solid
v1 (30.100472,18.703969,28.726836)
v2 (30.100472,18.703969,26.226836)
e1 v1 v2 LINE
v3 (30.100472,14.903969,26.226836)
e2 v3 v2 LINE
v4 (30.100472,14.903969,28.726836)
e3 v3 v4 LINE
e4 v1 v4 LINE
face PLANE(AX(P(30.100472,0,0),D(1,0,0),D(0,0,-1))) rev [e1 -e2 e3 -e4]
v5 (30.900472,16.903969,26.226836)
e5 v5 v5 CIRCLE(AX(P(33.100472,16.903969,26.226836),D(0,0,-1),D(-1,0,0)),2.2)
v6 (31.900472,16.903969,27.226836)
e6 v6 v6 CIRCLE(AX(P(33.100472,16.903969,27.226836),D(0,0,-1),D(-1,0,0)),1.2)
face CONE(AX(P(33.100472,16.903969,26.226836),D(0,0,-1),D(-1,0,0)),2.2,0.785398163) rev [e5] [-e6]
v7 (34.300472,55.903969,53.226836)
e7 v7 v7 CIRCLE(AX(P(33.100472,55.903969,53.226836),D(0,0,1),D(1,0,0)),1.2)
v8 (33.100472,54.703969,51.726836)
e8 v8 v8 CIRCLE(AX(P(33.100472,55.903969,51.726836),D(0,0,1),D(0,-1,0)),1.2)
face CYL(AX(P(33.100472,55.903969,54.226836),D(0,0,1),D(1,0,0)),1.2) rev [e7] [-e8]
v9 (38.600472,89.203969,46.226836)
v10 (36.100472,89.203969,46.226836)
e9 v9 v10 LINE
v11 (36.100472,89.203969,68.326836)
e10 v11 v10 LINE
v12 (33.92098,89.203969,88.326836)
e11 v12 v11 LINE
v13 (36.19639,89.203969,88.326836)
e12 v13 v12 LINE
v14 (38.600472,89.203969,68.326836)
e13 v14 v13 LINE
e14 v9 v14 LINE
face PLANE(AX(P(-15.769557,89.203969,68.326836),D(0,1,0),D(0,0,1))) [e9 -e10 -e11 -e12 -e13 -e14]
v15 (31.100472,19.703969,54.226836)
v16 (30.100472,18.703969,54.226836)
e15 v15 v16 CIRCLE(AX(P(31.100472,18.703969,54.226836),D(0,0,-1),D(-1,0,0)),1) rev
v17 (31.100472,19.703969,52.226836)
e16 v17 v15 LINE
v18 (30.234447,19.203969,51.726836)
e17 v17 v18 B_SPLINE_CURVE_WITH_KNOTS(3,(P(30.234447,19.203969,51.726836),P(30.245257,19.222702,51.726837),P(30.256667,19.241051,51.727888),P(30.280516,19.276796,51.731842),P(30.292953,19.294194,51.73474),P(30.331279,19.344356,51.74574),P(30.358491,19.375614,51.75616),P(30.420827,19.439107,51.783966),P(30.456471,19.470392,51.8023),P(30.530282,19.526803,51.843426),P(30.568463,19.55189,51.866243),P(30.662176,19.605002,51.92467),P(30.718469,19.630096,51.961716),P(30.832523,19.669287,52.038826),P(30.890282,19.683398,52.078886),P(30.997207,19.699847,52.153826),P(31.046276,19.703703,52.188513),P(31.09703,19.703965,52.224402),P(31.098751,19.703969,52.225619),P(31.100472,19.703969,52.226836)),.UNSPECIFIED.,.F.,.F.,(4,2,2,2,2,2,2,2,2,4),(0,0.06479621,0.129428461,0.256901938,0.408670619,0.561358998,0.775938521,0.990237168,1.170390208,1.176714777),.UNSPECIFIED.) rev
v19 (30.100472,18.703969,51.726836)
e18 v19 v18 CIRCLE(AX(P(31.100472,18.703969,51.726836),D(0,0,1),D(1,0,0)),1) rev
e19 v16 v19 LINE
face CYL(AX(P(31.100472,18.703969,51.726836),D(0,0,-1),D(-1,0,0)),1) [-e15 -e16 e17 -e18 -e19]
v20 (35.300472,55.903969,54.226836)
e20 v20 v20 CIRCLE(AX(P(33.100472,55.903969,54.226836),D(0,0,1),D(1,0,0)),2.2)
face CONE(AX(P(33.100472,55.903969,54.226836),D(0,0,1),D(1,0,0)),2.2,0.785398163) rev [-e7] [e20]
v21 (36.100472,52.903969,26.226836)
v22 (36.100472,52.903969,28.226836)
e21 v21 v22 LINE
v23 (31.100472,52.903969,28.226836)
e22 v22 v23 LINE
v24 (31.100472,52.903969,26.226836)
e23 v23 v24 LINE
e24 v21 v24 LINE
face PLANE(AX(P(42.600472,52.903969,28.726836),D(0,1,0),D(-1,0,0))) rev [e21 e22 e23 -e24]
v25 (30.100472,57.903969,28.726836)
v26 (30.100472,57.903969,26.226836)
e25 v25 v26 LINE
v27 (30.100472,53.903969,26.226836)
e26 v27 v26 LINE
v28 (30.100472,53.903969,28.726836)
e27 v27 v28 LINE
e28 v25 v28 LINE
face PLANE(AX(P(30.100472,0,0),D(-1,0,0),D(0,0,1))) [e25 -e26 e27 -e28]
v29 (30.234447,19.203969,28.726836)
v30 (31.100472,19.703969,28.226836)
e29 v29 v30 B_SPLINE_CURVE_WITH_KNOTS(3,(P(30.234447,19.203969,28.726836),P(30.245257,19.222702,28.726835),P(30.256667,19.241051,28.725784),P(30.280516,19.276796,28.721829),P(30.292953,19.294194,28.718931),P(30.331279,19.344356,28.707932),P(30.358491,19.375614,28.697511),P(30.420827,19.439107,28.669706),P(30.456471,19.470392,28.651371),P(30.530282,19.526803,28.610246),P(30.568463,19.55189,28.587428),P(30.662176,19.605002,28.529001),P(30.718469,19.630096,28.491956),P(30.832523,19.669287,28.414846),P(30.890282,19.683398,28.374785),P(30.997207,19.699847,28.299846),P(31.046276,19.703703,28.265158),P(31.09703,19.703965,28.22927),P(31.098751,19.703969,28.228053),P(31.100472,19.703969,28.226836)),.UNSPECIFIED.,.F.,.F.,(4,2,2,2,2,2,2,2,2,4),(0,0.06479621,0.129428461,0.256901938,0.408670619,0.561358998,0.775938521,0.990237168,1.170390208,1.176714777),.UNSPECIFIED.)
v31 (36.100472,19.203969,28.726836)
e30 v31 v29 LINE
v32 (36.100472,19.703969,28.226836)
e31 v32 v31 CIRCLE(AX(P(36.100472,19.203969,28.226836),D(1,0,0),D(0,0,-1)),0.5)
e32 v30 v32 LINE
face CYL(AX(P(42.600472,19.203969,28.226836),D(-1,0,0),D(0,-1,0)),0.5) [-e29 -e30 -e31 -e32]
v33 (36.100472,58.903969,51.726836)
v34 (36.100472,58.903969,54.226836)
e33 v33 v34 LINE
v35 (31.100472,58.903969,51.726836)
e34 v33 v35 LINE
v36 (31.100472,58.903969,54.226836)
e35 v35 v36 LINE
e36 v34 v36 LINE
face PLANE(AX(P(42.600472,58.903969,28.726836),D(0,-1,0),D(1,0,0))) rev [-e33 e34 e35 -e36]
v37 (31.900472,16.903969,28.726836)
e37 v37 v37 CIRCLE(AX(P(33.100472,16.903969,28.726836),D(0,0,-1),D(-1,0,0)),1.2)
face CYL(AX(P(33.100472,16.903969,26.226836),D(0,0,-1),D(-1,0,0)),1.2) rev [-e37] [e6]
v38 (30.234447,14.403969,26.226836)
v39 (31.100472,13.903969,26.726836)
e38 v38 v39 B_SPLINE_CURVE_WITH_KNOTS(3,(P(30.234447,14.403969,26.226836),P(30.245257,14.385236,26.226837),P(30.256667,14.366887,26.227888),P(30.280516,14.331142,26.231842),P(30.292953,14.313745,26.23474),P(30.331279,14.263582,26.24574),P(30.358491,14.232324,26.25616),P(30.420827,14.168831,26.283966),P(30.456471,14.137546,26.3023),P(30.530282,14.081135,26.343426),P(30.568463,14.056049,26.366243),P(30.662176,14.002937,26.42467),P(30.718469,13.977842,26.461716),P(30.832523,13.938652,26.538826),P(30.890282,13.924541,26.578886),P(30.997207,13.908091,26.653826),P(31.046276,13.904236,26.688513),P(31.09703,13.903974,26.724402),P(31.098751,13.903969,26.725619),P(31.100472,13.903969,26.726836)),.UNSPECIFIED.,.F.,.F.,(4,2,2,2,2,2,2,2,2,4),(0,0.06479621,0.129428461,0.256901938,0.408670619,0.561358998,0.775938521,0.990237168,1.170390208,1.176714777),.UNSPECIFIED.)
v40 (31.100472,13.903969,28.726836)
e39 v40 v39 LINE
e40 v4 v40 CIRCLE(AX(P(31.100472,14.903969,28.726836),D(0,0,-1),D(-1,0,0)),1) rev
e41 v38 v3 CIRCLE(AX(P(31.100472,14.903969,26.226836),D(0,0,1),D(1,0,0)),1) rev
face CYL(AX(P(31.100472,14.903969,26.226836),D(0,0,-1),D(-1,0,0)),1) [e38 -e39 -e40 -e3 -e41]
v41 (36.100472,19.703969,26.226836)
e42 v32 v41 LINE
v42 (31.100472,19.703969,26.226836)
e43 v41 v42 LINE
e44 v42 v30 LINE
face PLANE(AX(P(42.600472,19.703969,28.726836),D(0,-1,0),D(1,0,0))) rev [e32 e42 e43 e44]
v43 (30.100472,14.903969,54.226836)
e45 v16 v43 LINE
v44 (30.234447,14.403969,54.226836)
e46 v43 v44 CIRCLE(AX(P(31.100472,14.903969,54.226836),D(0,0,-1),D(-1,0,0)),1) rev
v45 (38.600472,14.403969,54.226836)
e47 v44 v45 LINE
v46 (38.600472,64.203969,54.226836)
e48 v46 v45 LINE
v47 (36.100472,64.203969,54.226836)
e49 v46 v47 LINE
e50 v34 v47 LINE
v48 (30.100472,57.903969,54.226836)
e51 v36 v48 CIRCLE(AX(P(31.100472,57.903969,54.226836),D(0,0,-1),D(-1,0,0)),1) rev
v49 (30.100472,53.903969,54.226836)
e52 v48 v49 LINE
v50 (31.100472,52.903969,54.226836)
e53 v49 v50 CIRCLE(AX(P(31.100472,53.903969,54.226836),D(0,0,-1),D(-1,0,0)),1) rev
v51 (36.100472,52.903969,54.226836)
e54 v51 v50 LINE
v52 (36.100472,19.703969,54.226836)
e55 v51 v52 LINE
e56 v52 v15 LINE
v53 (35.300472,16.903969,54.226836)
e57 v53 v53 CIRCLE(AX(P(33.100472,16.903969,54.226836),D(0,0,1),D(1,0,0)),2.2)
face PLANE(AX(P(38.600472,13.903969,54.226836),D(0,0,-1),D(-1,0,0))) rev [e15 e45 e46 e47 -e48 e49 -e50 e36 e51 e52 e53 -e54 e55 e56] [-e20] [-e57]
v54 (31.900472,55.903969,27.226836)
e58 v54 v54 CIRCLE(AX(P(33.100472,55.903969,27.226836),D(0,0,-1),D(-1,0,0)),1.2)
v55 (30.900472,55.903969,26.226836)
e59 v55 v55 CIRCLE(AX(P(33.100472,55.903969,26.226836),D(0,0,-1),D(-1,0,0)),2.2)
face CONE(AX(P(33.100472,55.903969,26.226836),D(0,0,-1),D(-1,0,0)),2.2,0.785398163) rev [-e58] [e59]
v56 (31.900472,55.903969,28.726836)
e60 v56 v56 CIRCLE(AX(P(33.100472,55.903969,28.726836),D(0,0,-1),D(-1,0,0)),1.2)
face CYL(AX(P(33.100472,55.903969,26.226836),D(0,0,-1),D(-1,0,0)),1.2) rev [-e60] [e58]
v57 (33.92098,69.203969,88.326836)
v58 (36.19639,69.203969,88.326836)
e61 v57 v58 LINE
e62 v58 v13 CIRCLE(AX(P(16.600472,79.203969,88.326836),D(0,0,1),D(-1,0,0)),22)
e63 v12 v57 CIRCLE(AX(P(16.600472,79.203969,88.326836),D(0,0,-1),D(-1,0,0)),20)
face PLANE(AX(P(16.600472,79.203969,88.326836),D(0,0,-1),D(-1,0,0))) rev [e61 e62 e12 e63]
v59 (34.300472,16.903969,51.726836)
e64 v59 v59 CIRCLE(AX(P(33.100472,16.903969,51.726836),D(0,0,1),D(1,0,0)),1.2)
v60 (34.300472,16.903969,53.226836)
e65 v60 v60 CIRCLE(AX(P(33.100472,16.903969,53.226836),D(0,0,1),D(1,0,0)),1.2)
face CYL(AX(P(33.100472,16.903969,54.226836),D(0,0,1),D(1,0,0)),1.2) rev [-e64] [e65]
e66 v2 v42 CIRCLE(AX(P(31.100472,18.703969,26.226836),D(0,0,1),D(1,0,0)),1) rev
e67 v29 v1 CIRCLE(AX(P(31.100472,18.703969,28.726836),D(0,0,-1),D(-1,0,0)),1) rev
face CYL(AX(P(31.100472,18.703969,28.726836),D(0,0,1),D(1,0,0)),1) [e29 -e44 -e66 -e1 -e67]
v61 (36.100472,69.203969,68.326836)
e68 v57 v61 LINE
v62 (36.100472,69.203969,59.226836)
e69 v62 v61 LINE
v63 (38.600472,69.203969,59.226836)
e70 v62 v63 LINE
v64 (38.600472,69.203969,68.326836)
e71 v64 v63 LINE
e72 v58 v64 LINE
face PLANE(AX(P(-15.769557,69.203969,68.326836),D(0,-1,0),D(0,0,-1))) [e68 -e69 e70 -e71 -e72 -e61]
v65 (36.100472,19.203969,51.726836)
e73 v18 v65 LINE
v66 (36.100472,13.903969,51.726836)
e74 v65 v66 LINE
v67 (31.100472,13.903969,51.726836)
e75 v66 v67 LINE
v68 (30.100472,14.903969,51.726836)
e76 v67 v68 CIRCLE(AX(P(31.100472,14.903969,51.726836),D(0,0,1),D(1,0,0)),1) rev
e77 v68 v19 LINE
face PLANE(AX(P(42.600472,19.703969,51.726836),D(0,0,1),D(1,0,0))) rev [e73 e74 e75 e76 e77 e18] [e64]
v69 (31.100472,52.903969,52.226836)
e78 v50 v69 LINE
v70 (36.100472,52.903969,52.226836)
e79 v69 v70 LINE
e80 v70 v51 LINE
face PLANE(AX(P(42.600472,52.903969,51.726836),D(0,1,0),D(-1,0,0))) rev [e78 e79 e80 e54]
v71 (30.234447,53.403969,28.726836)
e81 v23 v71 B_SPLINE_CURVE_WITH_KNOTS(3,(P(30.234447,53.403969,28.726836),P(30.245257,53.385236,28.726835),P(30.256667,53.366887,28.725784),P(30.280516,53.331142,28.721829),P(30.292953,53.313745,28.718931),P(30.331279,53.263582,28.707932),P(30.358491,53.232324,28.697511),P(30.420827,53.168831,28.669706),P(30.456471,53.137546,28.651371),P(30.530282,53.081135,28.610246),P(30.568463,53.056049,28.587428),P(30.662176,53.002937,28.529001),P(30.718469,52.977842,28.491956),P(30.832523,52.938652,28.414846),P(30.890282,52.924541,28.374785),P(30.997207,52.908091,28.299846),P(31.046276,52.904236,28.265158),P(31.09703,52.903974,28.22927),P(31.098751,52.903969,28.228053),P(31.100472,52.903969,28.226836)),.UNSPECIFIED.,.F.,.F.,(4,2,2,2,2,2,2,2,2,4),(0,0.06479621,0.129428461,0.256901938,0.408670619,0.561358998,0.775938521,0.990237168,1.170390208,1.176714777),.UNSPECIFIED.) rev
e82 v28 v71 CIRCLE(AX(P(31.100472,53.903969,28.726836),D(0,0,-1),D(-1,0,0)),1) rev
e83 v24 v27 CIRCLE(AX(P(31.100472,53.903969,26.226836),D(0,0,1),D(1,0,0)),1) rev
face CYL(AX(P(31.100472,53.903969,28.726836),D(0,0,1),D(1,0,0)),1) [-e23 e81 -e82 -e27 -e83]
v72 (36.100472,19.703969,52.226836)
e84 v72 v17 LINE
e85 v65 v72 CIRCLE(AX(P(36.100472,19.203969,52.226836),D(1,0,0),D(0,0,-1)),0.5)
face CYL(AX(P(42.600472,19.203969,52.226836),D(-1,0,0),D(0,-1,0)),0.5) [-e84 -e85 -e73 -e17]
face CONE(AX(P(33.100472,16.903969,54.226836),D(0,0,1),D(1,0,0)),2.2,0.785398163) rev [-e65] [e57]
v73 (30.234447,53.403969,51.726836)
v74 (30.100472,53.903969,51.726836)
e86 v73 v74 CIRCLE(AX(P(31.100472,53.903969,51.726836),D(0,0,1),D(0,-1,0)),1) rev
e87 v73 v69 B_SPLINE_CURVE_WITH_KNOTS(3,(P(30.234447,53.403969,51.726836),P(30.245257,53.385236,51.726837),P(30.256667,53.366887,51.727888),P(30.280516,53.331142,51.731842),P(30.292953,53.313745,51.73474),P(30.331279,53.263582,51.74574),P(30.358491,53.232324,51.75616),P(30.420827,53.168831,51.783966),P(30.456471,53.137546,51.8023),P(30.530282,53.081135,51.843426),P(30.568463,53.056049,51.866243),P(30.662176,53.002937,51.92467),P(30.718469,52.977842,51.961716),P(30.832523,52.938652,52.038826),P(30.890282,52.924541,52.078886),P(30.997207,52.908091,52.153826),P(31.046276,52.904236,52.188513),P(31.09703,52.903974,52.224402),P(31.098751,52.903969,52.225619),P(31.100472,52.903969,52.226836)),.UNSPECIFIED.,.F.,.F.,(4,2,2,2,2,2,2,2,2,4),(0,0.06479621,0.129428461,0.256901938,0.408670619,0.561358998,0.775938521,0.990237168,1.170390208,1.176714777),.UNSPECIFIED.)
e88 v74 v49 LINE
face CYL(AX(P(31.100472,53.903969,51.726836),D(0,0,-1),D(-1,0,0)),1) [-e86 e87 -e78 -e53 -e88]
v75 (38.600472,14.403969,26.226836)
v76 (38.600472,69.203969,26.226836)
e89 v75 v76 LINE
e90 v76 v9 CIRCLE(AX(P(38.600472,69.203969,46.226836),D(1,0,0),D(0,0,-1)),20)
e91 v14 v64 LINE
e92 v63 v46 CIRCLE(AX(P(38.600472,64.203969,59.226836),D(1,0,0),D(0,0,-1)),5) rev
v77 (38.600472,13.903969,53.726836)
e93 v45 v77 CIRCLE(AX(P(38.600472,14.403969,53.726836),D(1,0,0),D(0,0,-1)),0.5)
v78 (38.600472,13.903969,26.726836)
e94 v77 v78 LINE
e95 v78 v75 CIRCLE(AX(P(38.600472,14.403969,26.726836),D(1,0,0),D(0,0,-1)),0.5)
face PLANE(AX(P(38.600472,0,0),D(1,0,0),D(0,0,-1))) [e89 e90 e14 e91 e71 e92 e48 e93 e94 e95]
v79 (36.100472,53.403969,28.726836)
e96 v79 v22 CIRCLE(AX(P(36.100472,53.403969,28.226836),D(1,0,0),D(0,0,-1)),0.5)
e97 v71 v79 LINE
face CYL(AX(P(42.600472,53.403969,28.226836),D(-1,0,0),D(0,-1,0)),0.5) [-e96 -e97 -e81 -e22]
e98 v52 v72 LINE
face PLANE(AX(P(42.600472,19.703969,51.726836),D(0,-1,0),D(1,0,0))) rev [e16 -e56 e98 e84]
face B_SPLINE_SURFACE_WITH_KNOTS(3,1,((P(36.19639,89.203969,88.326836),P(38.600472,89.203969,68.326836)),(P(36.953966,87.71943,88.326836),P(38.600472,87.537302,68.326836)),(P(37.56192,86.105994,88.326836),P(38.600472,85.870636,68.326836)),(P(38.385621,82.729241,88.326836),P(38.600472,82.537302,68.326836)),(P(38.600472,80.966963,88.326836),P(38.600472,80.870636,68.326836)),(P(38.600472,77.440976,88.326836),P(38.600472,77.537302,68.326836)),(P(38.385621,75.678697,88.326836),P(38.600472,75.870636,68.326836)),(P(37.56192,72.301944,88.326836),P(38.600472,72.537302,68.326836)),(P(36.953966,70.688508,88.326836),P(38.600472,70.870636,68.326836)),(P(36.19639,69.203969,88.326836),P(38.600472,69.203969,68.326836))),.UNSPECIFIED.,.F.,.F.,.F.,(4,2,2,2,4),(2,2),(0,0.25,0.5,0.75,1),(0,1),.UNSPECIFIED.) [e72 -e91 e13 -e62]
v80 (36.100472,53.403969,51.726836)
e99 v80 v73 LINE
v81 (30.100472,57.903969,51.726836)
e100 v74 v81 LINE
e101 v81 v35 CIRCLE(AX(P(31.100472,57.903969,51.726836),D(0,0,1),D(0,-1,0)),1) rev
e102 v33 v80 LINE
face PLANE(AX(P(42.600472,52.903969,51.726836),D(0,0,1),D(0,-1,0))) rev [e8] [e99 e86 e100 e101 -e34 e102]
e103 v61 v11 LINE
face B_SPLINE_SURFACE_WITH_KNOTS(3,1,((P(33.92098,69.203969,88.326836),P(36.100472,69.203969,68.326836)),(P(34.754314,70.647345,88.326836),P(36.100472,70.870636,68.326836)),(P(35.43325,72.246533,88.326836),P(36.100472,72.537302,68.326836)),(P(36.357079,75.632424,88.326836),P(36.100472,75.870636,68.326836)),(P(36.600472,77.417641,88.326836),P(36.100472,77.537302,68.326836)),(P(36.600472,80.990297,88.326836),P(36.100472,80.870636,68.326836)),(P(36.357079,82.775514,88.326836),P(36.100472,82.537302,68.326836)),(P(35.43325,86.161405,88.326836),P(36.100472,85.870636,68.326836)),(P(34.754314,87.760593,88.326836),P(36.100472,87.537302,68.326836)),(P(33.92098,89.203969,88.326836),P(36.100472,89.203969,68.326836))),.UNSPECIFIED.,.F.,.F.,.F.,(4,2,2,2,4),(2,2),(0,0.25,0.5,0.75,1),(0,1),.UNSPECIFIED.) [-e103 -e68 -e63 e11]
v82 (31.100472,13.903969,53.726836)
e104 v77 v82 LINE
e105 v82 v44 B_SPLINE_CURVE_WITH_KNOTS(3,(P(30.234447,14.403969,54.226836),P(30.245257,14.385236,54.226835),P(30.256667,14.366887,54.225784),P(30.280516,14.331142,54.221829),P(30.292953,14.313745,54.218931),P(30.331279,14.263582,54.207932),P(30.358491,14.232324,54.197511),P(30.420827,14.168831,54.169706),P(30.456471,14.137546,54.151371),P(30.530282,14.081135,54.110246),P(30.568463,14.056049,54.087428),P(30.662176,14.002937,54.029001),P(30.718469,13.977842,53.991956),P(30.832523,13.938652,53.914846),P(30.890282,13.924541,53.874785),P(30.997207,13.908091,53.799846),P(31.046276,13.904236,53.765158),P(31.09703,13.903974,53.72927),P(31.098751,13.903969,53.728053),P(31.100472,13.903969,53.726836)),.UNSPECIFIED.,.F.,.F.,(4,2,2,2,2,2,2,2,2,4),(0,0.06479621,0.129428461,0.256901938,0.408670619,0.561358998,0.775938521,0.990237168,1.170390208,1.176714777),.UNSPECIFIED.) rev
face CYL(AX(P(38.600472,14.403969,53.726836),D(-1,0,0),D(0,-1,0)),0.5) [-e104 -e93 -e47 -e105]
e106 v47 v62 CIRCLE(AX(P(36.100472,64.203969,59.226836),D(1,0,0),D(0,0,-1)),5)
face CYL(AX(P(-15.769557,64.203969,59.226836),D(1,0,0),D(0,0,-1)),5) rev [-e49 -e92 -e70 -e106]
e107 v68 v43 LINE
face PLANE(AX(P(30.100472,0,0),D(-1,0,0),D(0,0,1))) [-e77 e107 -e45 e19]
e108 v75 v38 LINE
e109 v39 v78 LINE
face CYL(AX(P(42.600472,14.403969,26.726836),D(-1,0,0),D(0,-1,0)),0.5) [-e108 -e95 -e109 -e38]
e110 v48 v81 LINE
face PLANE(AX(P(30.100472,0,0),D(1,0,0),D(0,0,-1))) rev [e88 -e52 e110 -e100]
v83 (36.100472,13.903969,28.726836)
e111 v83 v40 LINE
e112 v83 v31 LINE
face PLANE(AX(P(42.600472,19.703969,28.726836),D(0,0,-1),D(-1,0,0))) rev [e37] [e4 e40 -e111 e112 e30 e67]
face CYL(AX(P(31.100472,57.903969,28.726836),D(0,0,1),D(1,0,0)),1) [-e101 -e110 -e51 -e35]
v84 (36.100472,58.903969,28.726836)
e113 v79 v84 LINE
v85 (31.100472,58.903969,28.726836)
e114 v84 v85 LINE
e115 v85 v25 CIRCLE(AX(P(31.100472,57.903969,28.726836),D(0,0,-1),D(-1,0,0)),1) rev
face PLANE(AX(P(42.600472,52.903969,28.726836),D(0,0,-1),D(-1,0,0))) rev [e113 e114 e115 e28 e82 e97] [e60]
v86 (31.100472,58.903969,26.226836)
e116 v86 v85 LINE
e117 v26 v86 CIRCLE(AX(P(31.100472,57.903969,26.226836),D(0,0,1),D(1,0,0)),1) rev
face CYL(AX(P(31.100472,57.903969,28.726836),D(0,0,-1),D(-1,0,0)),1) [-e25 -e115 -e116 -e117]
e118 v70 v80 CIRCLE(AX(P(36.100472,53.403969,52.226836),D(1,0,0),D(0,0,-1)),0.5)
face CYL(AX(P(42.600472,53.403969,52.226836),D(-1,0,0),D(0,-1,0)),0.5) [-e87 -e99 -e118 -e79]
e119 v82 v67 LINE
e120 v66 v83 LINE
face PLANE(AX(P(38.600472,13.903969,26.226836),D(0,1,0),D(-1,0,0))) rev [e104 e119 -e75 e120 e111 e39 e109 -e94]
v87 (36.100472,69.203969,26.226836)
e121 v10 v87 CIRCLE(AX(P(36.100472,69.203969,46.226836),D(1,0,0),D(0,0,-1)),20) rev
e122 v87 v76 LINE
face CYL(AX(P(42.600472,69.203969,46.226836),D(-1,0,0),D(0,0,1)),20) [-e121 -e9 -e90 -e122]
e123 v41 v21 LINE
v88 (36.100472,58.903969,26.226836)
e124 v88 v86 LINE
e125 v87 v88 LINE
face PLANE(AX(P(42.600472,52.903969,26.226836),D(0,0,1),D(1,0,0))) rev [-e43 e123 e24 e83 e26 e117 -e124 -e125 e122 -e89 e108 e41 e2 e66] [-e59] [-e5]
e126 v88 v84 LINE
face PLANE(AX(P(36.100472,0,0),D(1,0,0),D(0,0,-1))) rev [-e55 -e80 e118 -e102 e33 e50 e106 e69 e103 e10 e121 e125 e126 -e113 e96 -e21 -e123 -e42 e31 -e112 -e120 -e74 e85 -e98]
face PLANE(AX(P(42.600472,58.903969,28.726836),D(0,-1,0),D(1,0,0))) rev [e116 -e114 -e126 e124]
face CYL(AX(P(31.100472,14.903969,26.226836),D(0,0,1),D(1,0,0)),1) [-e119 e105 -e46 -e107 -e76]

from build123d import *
from OCP.BRepFilletAPI import BRepFilletAPI_MakeFillet

# Parameters (mm, degrees)
SKETCH1_W                                           = 2.5
SKETCH1_H                                           = 6
BOSS_EXTRUDE1_DEPTH                                 = 6
SKETCH1_H_2                                         = 5.8
BOSS_EXTRUDE1_2_DEPTH                               = 6
BOSS_EXTRUDE1_3_DEPTH                               = 6
BOSS_EXTRUDE1_4_DEPTH                               = 6
SKETCH2_W                                           = 28
SKETCH2_H                                           = 45
BOSS_EXTRUDE2_DEPTH                                 = 2.5
BOSS_EXTRUDE3_DEPTH                                 = 2.5
CSK_FOR_M2_COUNTERSUNK_FLAT_HEAD_SCREW1_D           = 2.4
CSK_FOR_M2_COUNTERSUNK_FLAT_HEAD_SCREW1_DEPTH       = 4
CSK_FOR_M2_COUNTERSUNK_FLAT_HEAD_SCREW1_CSINK_D     = 4.4
CSK_FOR_M2_COUNTERSUNK_FLAT_HEAD_SCREW1_CSINK_ANGLE = 90
CSK_FOR_M2_COUNTERSUNK_FLAT_HEAD_SCREW1_TIP         = 0.721032743
CSK_FOR_M2_COUNTERSUNK_FLAT_HEAD_SCREW2_D           = 2.4
CSK_FOR_M2_COUNTERSUNK_FLAT_HEAD_SCREW2_DEPTH       = 4
CSK_FOR_M2_COUNTERSUNK_FLAT_HEAD_SCREW2_CSINK_D     = 4.4
CSK_FOR_M2_COUNTERSUNK_FLAT_HEAD_SCREW2_CSINK_ANGLE = 90
CSK_FOR_M2_COUNTERSUNK_FLAT_HEAD_SCREW2_TIP         = 0.721032743
FILLET1_R1                                          = 20
FILLET1_R2                                          = 5
FILLET2_R                                           = 1
FILLET3_R                                           = 0.5


with BuildPart() as part:
    # Sketch1 → Boss-Extrude1 (new body)
    with BuildSketch(Plane(origin=(30.100472417, 0, 0), x_dir=(0, 0, -1), z_dir=(1, 0, 0))):
        with Locations((-27.476835801, 55.903969126)):
            Rectangle(SKETCH1_W, SKETCH1_H)
    extrude(amount=BOSS_EXTRUDE1_DEPTH)



with BuildPart() as body_2:
    # Sketch1 → Boss-Extrude1 2 (new body)
    with BuildSketch(Plane(origin=(30.100472417, 0, 0), x_dir=(0, 0, -1), z_dir=(1, 0, 0))):
        with Locations((-27.476835801, 16.803969126)):
            Rectangle(SKETCH1_W, SKETCH1_H_2)
    extrude(amount=BOSS_EXTRUDE1_2_DEPTH)


with BuildPart() as body_3:
    # Sketch1 → Boss-Extrude1 3 (new body)
    with BuildSketch(Plane(origin=(30.100472417, 0, 0), x_dir=(0, 0, -1), z_dir=(1, 0, 0))):
        with Locations((-52.976835801, 16.803969126)):
            Rectangle(SKETCH1_W, SKETCH1_H_2)
    extrude(amount=BOSS_EXTRUDE1_3_DEPTH)


with BuildPart() as body_4:
    # Sketch1 → Boss-Extrude1 4 (new body)
    with BuildSketch(Plane(origin=(30.100472417, 0, 0), x_dir=(0, 0, -1), z_dir=(1, 0, 0))):
        with Locations((-52.976835801, 55.903969126)):
            Rectangle(SKETCH1_W, SKETCH1_H)
    extrude(amount=BOSS_EXTRUDE1_4_DEPTH)


with BuildPart() as part_1:
    add(part.part)

    add(body_2.part)  # Boss-Extrude2 merges body 2

    add(body_3.part)  # Boss-Extrude2 merges body 3

    add(body_4.part)  # Boss-Extrude2 merges body 4
    # Sketch2 → Boss-Extrude2 (add)
    with BuildSketch(Plane(origin=(36.100472417, 0, 0), x_dir=(0, 0, -1), z_dir=(1, 0, 0))):
        with Locations((-40.226835801, 36.403969126)):
            Rectangle(SKETCH2_W, SKETCH2_H)
    extrude(amount=BOSS_EXTRUDE2_DEPTH)

    # Sketch3 → Boss-Extrude3 (add)
    with BuildSketch(Plane(origin=(38.600472417, 0, 0), x_dir=(0, 0, -1), z_dir=(1, 0, 0))):
        Polygon((-68.326835801, 89.203969126), (-26.226835801, 89.203969126), (-26.226835801, 58.903969126), (-54.226835801, 58.903969126), (-54.226835801, 69.203969126), (-68.326835801, 69.203969126), align=None)
    extrude(amount=-BOSS_EXTRUDE3_DEPTH)

    # CSK for M2 Countersunk Flat Head Screw1
    with Locations(Plane.XY.offset(54.226835801)):
        with Locations((33.100472417, 55.903969126), (33.100472417, 16.903969126)):
            CounterSinkHole(CSK_FOR_M2_COUNTERSUNK_FLAT_HEAD_SCREW1_D / 2, CSK_FOR_M2_COUNTERSUNK_FLAT_HEAD_SCREW1_CSINK_D / 2, depth=CSK_FOR_M2_COUNTERSUNK_FLAT_HEAD_SCREW1_DEPTH, counter_sink_angle=CSK_FOR_M2_COUNTERSUNK_FLAT_HEAD_SCREW1_CSINK_ANGLE)
            with Locations((0, 0, -(CSK_FOR_M2_COUNTERSUNK_FLAT_HEAD_SCREW1_DEPTH + CSK_FOR_M2_COUNTERSUNK_FLAT_HEAD_SCREW1_TIP / 2))):  # 118° drill point
                Cone(0, CSK_FOR_M2_COUNTERSUNK_FLAT_HEAD_SCREW1_D / 2, CSK_FOR_M2_COUNTERSUNK_FLAT_HEAD_SCREW1_TIP, mode=Mode.SUBTRACT)

    # CSK for M2 Countersunk Flat Head Screw2
    with Locations(Plane(origin=(0, 0, 26.226835801), x_dir=(-1, 0, 0), z_dir=(0, 0, -1))):
        with Locations((-33.100472417, 55.903969126), (-33.100472417, 16.903969126)):
            CounterSinkHole(CSK_FOR_M2_COUNTERSUNK_FLAT_HEAD_SCREW2_D / 2, CSK_FOR_M2_COUNTERSUNK_FLAT_HEAD_SCREW2_CSINK_D / 2, depth=CSK_FOR_M2_COUNTERSUNK_FLAT_HEAD_SCREW2_DEPTH, counter_sink_angle=CSK_FOR_M2_COUNTERSUNK_FLAT_HEAD_SCREW2_CSINK_ANGLE)
            with Locations((0, 0, -(CSK_FOR_M2_COUNTERSUNK_FLAT_HEAD_SCREW2_DEPTH + CSK_FOR_M2_COUNTERSUNK_FLAT_HEAD_SCREW2_TIP / 2))):  # 118° drill point
                Cone(0, CSK_FOR_M2_COUNTERSUNK_FLAT_HEAD_SCREW2_D / 2, CSK_FOR_M2_COUNTERSUNK_FLAT_HEAD_SCREW2_TIP, mode=Mode.SUBTRACT)

    # Fillet1: one fillet with a radius per group of edges: ONE call of the kernel's fillet builder (fillet() takes one radius for all edges)
    fillet1_edges_1 = [part_1.edges().sort_by_distance(p)[0] for p in [
        (37.350472417, 89.203969126, 26.226835801),
    ]]
    fillet1_edges_2 = [part_1.edges().sort_by_distance(p)[0] for p in [
        (37.350472417, 69.203969126, 54.226835801),
    ]]
    fillet1 = BRepFilletAPI_MakeFillet(part_1.part.solid().wrapped)
    for e in fillet1_edges_1:
        fillet1.Add(FILLET1_R1, e.wrapped)
    for e in fillet1_edges_2:
        fillet1.Add(FILLET1_R2, e.wrapped)
    add(Compound.cast(fillet1.Shape()), mode=Mode.REPLACE)

    # Loft1: read off the stored shape, not the designer's step
    # Loft1: loft between two sections, ruled curve by curve
    loft1_from = [
        Edge.make_bspline([(36.19639036, 89.203969126, 88.326835801), (36.953966117, 87.719429888, 88.326835801), (37.561920044, 86.105994191, 88.326835801), (38.385620937, 82.729240829, 88.326835801), (38.600472417, 80.966962635, 88.326835801), (38.600472417, 77.440975617, 88.326835801), (38.385620937, 75.678697423, 88.326835801), (37.561920044, 72.30194406, 88.326835801), (36.953966117, 70.688508364, 88.326835801), (36.19639036, 69.203969126, 88.326835801)], [0, 0, 0, 0, 0.25, 0.25, 0.5, 0.5, 0.75, 0.75, 1, 1, 1, 1], 3),
        Edge.make_bspline([(33.920980493, 69.203969126, 88.326835801), (34.754313826, 70.647344799, 88.326835801), (35.433250093, 72.246533252, 88.326835801), (36.357078765, 75.632424009, 88.326835801), (36.600472417, 77.417641176, 88.326835801), (36.600472417, 80.990297075, 88.326835801), (36.357078765, 82.775514243, 88.326835801), (35.433250093, 86.161405, 88.326835801), (34.754313826, 87.760593453, 88.326835801), (33.920980493, 89.203969126, 88.326835801)], [0, 0, 0, 0, 0.25, 0.25, 0.5, 0.5, 0.75, 0.75, 1, 1, 1, 1], 3),
        Edge.make_line((33.920980493, 69.203969126, 88.326835801), (36.19639036, 69.203969126, 88.326835801)),
        Edge.make_line((33.920980493, 89.203969126, 88.326835801), (36.19639036, 89.203969126, 88.326835801)),
    ]
    loft1_to = [
        Edge.make_bspline([(38.600472417, 89.203969126, 68.326835801), (38.600472417, 87.537302459, 68.326835801), (38.600472417, 85.870635792, 68.326835801), (38.600472417, 82.537302459, 68.326835801), (38.600472417, 80.870635792, 68.326835801), (38.600472417, 77.537302459, 68.326835801), (38.600472417, 75.870635792, 68.326835801), (38.600472417, 72.537302459, 68.326835801), (38.600472417, 70.870635792, 68.326835801), (38.600472417, 69.203969126, 68.326835801)], [0, 0, 0, 0, 0.25, 0.25, 0.5, 0.5, 0.75, 0.75, 1, 1, 1, 1], 3),
        Edge.make_bspline([(36.100472417, 69.203969126, 68.326835801), (36.100472417, 70.870635792, 68.326835801), (36.100472417, 72.537302459, 68.326835801), (36.100472417, 75.870635792, 68.326835801), (36.100472417, 77.537302459, 68.326835801), (36.100472417, 80.870635792, 68.326835801), (36.100472417, 82.537302459, 68.326835801), (36.100472417, 85.870635792, 68.326835801), (36.100472417, 87.537302459, 68.326835801), (36.100472417, 89.203969126, 68.326835801)], [0, 0, 0, 0, 0.25, 0.25, 0.5, 0.5, 0.75, 0.75, 1, 1, 1, 1], 3),
        Edge.make_line((36.100472417, 69.203969126, 68.326835801), (38.600472417, 69.203969126, 68.326835801)),
        Edge.make_line((36.100472417, 89.203969126, 68.326835801), (38.600472417, 89.203969126, 68.326835801)),
    ]
    loft1 = Solid(Shell([*[Face.make_surface_from_curves(loft1_from[k], loft1_to[k]) for k in range(4)], Face(Wire(loft1_from)), Face(Wire(loft1_to))]))
    add(loft1)

    # Fillet2
    fillet2_edges = [part_1.edges().sort_by_distance(p)[0] for p in [
        (30.100472417, 58.903969126, 27.476835801),
        (30.100472417, 52.903969126, 27.476835801),
        (30.100472417, 19.703969126, 27.476835801),
        (30.100472417, 13.903969126, 27.476835801),
        (30.100472417, 13.903969126, 52.976835801),
        (30.100472417, 19.703969126, 52.976835801),
        (30.100472417, 52.903969126, 52.976835801),
        (30.100472417, 58.903969126, 52.976835801),
    ]]
    fillet(fillet2_edges, radius=FILLET2_R)

    # Fillet3
    # the kernel refuses this fillet: 0.5 mm, written as the material it takes off along each edge
    with BuildSketch(Plane(origin=(29.850472417, 52.903969126, 28.726835801), x_dir=(0, 1, 0), z_dir=(1, 0, 0)), Plane(origin=(29.850472417, 52.903969126, 51.726835801), x_dir=(0, 0, 1), z_dir=(1, 0, 0))) as fillet3_piece_1:
        with BuildLine():
            CenterArc((FILLET3_R, -FILLET3_R), FILLET3_R, 90, 90)
            Line((0, -FILLET3_R), (0, 0))
            Line((0, 0), (FILLET3_R, 0))
        make_face()
    extrude(amount=6.25, mode=Mode.SUBTRACT)
    with BuildSketch(Plane(origin=(39.850472417, 13.903969126, 26.226835801), x_dir=(0, 0, 1), z_dir=(-1, 0, 0)), Plane(origin=(39.850472417, 13.903969126, 54.226835801), x_dir=(0, 1, 0), z_dir=(-1, 0, 0))) as fillet3_piece_2:
        with BuildLine():
            CenterArc((FILLET3_R, FILLET3_R), FILLET3_R, 180, 90)
            Line((0, FILLET3_R), (0, 0))
            Line((0, 0), (FILLET3_R, 0))
        make_face()
    extrude(amount=10, mode=Mode.SUBTRACT)
    with BuildSketch(Plane(origin=(29.850472417, 19.703969126, 28.726835801), x_dir=(0, -1, 0), z_dir=(1, 0, 0)), Plane(origin=(29.850472417, 19.703969126, 51.726835801), x_dir=(0, 0, 1), z_dir=(1, 0, 0))) as fillet3_piece_3:
        with BuildLine():
            CenterArc((FILLET3_R, FILLET3_R), FILLET3_R, 180, 90)
            Line((0, FILLET3_R), (0, 0))
            Line((0, 0), (FILLET3_R, 0))
        make_face()
    extrude(amount=6.25, mode=Mode.SUBTRACT)


solid = part_1.part
